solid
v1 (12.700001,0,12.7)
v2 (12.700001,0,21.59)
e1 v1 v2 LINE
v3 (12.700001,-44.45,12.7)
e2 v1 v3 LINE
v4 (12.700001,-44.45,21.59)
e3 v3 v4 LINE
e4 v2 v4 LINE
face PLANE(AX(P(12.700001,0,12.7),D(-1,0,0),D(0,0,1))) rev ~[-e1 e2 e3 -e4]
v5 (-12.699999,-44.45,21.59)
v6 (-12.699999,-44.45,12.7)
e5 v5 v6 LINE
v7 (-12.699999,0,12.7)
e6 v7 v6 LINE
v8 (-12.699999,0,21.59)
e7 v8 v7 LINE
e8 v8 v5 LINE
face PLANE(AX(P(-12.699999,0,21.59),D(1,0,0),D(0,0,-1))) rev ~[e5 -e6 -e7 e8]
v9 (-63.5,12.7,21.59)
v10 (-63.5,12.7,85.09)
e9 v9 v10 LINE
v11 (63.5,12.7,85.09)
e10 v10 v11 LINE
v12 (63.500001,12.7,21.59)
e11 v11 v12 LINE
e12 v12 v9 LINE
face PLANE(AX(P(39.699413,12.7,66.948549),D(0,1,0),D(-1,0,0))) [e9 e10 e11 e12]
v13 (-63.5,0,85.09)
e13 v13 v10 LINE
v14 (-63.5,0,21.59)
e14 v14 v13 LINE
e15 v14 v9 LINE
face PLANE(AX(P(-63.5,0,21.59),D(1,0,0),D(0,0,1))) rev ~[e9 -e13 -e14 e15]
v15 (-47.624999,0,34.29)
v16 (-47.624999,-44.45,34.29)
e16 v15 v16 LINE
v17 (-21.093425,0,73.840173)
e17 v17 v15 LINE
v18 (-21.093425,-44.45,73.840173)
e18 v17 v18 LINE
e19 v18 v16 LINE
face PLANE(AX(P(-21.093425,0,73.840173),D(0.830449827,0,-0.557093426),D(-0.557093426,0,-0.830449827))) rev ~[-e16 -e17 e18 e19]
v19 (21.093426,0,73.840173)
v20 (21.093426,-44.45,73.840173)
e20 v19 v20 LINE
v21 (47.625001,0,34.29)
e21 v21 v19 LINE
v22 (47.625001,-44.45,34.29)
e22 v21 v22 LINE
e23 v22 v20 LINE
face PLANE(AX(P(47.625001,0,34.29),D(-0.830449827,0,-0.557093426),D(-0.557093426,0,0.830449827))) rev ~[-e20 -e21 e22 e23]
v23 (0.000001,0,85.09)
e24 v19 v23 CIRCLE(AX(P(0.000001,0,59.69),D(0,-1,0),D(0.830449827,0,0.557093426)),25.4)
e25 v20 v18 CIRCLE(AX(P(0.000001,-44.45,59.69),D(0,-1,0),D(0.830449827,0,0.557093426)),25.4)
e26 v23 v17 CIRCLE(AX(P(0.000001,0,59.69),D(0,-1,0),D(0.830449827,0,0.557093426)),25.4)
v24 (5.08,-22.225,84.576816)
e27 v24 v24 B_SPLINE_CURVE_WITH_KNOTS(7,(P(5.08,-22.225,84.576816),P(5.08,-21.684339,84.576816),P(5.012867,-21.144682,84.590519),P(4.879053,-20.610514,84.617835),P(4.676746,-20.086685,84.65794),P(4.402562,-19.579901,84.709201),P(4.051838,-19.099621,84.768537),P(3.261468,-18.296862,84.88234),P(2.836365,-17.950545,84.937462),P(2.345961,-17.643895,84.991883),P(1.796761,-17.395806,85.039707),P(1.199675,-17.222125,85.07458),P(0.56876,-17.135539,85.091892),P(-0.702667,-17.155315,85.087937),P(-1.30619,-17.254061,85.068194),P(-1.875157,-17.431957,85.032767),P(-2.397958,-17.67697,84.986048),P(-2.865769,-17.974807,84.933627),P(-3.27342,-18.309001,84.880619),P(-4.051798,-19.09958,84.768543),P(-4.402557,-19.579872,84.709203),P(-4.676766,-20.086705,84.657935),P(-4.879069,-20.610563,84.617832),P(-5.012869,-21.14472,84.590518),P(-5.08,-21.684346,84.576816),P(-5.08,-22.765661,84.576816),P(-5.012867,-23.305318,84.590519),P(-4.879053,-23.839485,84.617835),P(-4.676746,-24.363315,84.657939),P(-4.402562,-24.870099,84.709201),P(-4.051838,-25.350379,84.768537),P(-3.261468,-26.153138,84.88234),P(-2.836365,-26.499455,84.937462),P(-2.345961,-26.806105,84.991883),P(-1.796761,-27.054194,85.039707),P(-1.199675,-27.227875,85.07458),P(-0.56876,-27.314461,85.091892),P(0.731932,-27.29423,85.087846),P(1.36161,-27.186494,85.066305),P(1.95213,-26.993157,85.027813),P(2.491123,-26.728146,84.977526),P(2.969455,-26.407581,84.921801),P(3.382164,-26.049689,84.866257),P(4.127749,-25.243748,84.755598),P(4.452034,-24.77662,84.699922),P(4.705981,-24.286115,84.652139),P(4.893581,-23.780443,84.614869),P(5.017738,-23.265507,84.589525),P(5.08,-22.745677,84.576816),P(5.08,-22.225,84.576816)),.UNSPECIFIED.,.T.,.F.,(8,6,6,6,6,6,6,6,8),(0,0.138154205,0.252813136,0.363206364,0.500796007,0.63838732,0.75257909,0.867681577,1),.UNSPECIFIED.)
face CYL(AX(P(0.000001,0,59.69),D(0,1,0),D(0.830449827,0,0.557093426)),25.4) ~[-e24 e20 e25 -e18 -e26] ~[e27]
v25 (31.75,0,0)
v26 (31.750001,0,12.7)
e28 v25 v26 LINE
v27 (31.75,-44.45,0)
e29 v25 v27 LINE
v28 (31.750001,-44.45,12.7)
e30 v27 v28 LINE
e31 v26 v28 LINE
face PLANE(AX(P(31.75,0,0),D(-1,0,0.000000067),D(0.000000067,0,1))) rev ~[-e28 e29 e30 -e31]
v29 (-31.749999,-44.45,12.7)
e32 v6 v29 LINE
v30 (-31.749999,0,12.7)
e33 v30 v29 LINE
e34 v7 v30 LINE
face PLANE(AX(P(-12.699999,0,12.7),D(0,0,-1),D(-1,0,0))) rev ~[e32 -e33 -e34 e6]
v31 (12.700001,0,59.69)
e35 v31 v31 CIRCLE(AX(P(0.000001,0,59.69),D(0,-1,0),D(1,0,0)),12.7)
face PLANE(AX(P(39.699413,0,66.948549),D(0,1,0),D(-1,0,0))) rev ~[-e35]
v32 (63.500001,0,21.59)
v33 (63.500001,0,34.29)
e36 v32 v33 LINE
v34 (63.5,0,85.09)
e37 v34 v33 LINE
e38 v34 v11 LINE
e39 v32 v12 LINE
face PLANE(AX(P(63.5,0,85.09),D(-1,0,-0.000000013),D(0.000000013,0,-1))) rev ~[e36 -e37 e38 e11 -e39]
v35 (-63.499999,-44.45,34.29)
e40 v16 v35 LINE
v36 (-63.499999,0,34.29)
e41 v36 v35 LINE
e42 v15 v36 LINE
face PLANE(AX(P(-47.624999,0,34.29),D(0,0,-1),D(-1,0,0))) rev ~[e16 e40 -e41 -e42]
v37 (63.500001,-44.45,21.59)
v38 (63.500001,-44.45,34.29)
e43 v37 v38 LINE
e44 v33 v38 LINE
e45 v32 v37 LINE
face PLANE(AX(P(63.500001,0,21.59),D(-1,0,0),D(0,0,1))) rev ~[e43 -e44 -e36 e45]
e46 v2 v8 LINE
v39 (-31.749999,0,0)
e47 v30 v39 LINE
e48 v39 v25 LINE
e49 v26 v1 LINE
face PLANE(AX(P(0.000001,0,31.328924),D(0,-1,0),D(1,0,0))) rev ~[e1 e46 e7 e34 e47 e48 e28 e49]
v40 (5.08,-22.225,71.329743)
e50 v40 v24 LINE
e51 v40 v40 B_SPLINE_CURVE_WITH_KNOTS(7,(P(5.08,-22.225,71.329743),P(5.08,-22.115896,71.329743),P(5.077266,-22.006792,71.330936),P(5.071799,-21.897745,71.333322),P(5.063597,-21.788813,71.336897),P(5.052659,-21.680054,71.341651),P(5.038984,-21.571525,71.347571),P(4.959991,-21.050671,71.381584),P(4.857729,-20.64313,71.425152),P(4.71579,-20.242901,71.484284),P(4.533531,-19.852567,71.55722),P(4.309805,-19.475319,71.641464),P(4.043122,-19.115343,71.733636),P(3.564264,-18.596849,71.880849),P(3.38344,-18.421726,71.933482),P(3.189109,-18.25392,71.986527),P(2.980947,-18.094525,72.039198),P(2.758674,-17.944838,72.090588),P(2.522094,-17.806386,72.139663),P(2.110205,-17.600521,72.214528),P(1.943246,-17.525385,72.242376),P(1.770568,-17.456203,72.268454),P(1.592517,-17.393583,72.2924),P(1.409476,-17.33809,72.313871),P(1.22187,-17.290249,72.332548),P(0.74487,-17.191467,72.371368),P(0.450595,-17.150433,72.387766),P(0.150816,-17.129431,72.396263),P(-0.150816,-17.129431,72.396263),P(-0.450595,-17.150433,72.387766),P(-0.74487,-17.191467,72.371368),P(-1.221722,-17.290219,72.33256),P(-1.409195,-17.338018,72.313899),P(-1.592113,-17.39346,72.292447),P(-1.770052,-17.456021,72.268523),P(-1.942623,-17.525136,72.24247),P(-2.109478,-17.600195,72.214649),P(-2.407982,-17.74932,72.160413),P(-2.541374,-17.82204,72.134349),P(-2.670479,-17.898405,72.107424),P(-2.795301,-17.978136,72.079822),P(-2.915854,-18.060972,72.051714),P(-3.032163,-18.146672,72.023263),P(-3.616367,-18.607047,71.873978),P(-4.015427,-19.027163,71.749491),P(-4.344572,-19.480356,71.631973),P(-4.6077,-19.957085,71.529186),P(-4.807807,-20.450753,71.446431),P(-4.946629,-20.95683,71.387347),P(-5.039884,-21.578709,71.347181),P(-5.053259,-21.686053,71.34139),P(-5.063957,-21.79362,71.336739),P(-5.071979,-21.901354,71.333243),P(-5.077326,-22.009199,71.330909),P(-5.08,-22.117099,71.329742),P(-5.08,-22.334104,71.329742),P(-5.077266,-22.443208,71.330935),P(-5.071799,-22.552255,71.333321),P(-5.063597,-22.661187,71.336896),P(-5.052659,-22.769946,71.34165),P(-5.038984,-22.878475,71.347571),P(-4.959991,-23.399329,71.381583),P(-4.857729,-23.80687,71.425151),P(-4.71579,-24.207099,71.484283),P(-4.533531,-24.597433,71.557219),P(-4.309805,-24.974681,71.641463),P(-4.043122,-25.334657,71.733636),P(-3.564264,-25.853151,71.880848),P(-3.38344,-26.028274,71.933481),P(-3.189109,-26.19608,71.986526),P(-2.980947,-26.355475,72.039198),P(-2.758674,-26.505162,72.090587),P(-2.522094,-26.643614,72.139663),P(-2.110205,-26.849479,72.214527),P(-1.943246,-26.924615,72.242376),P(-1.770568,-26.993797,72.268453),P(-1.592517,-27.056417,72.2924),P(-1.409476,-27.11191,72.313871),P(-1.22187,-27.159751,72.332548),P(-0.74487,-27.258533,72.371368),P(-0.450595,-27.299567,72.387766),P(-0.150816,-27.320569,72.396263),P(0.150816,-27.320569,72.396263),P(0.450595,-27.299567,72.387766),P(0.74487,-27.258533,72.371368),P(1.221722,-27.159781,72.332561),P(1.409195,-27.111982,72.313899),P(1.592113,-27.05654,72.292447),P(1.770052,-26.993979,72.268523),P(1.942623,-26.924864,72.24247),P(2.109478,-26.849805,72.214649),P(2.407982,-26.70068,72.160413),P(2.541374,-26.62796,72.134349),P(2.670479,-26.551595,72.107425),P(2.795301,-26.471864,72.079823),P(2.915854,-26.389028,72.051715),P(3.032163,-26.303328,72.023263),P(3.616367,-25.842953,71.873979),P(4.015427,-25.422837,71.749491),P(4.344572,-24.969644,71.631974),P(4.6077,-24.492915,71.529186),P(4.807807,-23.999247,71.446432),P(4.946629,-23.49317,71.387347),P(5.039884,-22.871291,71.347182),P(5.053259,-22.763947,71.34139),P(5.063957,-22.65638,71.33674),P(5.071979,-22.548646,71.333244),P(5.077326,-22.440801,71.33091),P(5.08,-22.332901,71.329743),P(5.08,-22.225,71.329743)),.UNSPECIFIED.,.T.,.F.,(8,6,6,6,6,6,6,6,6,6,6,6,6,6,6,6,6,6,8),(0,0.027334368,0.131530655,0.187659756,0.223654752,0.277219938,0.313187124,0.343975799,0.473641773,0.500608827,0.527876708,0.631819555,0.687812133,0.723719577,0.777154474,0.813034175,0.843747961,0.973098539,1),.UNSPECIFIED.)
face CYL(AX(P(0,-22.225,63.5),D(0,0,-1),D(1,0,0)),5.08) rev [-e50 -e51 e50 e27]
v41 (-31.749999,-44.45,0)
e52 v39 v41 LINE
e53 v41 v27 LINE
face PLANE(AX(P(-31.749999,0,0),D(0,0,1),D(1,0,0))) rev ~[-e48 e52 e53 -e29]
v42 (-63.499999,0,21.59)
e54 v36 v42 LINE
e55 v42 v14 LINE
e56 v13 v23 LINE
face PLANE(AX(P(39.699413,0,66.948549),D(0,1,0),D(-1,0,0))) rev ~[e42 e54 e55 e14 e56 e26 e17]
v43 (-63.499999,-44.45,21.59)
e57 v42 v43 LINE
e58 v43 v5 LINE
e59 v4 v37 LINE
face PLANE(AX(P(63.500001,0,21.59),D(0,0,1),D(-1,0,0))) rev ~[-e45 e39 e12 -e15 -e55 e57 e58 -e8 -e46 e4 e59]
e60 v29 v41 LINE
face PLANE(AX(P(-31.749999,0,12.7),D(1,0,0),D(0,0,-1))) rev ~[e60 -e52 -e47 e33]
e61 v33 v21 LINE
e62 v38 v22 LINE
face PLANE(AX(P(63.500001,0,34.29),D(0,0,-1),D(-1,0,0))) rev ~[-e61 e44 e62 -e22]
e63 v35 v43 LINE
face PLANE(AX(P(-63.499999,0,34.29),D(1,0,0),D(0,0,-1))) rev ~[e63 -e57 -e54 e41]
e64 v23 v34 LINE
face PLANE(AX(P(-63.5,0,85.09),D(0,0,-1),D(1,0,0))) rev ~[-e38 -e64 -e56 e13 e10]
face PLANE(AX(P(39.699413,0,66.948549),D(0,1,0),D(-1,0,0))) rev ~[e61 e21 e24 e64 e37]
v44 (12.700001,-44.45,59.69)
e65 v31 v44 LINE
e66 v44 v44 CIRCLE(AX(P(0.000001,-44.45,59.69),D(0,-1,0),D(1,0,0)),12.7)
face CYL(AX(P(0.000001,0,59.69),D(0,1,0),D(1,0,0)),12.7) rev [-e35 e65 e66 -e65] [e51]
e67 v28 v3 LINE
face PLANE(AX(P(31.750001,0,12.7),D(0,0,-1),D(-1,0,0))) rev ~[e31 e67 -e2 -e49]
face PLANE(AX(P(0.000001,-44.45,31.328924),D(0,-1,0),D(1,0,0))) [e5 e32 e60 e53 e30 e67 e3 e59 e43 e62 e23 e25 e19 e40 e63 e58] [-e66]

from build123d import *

# Parameters (mm, degrees)
F0_R     = 12.7
F1_DEPTH = 44.45
F3_DEPTH = 12.7
F5_START = 63.5
F4_R     = 5.08
F5_DEPTH = 21.591


# Not quite as in the source:
# - ends of sketch curves that miss each other by under 0.0002 mm in the source are joined


with BuildPart() as f1:
    # F0 (on Front) → F1 (new body)
    with BuildSketch(Plane.XZ):
        with BuildLine():
            Line((0, 0), (31.75, 0))
            Line((31.75, 0), (31.7500008563, 12.7))
            Line((31.7500008563, 12.7), (12.7000008563, 12.7))
            Line((12.7000008563, 12.7), (12.7000008563, 21.59))
            Line((12.7000008563, 21.59), (63.5000008563, 21.59))
            Line((63.5000008563, 21.59), (63.5000008563, 34.29))
            Line((63.5000008563, 34.29), (47.6250008563, 34.29))
            Line((47.6250008563, 34.29), (21.0934264618, 73.8401730104))
            ThreePointArc((21.0934264618, 73.8401730104), (8.563e-07, 85.09), (-21.0934247492, 73.8401730104))
            Line((-21.0934247492, 73.8401730104), (-47.6249991437, 34.29))
            Line((-47.6249991437, 34.29), (-63.4999991437, 34.29))
            Line((-63.4999991437, 34.29), (-63.4999991437, 21.59))
            Line((-63.4999991437, 21.59), (-12.6999991437, 21.59))
            Line((-12.6999991437, 21.59), (-12.6999991437, 12.7))
            Line((-12.6999991437, 12.7), (-31.7499991437, 12.7))
            Line((-31.7499991437, 12.7), (-31.7499991437, 0))
            Line((-31.7499991437, 0), (0, 0))
        make_face()
        with Locations((8.563e-07, 59.69)):
            Circle(F0_R, mode=Mode.SUBTRACT)
    extrude(amount=F1_DEPTH)

    # F2 (on face) → F3 (join)
    with BuildSketch(Plane(origin=(0, 0, 0), x_dir=(-1, 0, 0), z_dir=(0, 1, 0))):
        with BuildLine():
            Line((-63.5, 85.09), (-63.500000685, 34.29))
            Line((-63.500000685, 34.29), (-47.6250008563, 34.29))
            Line((-47.6250008563, 34.29), (-21.0934264618, 73.8401730104))
            ThreePointArc((-21.0934264618, 73.8401730104), (-11.9529420328, 82.1017647059), (-8.563e-07, 85.09))
            Line((-8.563e-07, 85.09), (-63.5, 85.09))
        make_face()
        Polygon((-63.5000008563, 21.59), (0, 21.59), (63.5, 21.59), (63.5, 85.09), (-63.5, 85.09), align=None)
    extrude(amount=F3_DEPTH)

    # F4 (on Top) → F5 (cut)
    with BuildSketch(Plane.XY.offset(F5_START)):
        with Locations((0, -22.225)):
            Circle(F4_R)
    extrude(amount=F5_DEPTH, mode=Mode.SUBTRACT)


solid = f1.part
